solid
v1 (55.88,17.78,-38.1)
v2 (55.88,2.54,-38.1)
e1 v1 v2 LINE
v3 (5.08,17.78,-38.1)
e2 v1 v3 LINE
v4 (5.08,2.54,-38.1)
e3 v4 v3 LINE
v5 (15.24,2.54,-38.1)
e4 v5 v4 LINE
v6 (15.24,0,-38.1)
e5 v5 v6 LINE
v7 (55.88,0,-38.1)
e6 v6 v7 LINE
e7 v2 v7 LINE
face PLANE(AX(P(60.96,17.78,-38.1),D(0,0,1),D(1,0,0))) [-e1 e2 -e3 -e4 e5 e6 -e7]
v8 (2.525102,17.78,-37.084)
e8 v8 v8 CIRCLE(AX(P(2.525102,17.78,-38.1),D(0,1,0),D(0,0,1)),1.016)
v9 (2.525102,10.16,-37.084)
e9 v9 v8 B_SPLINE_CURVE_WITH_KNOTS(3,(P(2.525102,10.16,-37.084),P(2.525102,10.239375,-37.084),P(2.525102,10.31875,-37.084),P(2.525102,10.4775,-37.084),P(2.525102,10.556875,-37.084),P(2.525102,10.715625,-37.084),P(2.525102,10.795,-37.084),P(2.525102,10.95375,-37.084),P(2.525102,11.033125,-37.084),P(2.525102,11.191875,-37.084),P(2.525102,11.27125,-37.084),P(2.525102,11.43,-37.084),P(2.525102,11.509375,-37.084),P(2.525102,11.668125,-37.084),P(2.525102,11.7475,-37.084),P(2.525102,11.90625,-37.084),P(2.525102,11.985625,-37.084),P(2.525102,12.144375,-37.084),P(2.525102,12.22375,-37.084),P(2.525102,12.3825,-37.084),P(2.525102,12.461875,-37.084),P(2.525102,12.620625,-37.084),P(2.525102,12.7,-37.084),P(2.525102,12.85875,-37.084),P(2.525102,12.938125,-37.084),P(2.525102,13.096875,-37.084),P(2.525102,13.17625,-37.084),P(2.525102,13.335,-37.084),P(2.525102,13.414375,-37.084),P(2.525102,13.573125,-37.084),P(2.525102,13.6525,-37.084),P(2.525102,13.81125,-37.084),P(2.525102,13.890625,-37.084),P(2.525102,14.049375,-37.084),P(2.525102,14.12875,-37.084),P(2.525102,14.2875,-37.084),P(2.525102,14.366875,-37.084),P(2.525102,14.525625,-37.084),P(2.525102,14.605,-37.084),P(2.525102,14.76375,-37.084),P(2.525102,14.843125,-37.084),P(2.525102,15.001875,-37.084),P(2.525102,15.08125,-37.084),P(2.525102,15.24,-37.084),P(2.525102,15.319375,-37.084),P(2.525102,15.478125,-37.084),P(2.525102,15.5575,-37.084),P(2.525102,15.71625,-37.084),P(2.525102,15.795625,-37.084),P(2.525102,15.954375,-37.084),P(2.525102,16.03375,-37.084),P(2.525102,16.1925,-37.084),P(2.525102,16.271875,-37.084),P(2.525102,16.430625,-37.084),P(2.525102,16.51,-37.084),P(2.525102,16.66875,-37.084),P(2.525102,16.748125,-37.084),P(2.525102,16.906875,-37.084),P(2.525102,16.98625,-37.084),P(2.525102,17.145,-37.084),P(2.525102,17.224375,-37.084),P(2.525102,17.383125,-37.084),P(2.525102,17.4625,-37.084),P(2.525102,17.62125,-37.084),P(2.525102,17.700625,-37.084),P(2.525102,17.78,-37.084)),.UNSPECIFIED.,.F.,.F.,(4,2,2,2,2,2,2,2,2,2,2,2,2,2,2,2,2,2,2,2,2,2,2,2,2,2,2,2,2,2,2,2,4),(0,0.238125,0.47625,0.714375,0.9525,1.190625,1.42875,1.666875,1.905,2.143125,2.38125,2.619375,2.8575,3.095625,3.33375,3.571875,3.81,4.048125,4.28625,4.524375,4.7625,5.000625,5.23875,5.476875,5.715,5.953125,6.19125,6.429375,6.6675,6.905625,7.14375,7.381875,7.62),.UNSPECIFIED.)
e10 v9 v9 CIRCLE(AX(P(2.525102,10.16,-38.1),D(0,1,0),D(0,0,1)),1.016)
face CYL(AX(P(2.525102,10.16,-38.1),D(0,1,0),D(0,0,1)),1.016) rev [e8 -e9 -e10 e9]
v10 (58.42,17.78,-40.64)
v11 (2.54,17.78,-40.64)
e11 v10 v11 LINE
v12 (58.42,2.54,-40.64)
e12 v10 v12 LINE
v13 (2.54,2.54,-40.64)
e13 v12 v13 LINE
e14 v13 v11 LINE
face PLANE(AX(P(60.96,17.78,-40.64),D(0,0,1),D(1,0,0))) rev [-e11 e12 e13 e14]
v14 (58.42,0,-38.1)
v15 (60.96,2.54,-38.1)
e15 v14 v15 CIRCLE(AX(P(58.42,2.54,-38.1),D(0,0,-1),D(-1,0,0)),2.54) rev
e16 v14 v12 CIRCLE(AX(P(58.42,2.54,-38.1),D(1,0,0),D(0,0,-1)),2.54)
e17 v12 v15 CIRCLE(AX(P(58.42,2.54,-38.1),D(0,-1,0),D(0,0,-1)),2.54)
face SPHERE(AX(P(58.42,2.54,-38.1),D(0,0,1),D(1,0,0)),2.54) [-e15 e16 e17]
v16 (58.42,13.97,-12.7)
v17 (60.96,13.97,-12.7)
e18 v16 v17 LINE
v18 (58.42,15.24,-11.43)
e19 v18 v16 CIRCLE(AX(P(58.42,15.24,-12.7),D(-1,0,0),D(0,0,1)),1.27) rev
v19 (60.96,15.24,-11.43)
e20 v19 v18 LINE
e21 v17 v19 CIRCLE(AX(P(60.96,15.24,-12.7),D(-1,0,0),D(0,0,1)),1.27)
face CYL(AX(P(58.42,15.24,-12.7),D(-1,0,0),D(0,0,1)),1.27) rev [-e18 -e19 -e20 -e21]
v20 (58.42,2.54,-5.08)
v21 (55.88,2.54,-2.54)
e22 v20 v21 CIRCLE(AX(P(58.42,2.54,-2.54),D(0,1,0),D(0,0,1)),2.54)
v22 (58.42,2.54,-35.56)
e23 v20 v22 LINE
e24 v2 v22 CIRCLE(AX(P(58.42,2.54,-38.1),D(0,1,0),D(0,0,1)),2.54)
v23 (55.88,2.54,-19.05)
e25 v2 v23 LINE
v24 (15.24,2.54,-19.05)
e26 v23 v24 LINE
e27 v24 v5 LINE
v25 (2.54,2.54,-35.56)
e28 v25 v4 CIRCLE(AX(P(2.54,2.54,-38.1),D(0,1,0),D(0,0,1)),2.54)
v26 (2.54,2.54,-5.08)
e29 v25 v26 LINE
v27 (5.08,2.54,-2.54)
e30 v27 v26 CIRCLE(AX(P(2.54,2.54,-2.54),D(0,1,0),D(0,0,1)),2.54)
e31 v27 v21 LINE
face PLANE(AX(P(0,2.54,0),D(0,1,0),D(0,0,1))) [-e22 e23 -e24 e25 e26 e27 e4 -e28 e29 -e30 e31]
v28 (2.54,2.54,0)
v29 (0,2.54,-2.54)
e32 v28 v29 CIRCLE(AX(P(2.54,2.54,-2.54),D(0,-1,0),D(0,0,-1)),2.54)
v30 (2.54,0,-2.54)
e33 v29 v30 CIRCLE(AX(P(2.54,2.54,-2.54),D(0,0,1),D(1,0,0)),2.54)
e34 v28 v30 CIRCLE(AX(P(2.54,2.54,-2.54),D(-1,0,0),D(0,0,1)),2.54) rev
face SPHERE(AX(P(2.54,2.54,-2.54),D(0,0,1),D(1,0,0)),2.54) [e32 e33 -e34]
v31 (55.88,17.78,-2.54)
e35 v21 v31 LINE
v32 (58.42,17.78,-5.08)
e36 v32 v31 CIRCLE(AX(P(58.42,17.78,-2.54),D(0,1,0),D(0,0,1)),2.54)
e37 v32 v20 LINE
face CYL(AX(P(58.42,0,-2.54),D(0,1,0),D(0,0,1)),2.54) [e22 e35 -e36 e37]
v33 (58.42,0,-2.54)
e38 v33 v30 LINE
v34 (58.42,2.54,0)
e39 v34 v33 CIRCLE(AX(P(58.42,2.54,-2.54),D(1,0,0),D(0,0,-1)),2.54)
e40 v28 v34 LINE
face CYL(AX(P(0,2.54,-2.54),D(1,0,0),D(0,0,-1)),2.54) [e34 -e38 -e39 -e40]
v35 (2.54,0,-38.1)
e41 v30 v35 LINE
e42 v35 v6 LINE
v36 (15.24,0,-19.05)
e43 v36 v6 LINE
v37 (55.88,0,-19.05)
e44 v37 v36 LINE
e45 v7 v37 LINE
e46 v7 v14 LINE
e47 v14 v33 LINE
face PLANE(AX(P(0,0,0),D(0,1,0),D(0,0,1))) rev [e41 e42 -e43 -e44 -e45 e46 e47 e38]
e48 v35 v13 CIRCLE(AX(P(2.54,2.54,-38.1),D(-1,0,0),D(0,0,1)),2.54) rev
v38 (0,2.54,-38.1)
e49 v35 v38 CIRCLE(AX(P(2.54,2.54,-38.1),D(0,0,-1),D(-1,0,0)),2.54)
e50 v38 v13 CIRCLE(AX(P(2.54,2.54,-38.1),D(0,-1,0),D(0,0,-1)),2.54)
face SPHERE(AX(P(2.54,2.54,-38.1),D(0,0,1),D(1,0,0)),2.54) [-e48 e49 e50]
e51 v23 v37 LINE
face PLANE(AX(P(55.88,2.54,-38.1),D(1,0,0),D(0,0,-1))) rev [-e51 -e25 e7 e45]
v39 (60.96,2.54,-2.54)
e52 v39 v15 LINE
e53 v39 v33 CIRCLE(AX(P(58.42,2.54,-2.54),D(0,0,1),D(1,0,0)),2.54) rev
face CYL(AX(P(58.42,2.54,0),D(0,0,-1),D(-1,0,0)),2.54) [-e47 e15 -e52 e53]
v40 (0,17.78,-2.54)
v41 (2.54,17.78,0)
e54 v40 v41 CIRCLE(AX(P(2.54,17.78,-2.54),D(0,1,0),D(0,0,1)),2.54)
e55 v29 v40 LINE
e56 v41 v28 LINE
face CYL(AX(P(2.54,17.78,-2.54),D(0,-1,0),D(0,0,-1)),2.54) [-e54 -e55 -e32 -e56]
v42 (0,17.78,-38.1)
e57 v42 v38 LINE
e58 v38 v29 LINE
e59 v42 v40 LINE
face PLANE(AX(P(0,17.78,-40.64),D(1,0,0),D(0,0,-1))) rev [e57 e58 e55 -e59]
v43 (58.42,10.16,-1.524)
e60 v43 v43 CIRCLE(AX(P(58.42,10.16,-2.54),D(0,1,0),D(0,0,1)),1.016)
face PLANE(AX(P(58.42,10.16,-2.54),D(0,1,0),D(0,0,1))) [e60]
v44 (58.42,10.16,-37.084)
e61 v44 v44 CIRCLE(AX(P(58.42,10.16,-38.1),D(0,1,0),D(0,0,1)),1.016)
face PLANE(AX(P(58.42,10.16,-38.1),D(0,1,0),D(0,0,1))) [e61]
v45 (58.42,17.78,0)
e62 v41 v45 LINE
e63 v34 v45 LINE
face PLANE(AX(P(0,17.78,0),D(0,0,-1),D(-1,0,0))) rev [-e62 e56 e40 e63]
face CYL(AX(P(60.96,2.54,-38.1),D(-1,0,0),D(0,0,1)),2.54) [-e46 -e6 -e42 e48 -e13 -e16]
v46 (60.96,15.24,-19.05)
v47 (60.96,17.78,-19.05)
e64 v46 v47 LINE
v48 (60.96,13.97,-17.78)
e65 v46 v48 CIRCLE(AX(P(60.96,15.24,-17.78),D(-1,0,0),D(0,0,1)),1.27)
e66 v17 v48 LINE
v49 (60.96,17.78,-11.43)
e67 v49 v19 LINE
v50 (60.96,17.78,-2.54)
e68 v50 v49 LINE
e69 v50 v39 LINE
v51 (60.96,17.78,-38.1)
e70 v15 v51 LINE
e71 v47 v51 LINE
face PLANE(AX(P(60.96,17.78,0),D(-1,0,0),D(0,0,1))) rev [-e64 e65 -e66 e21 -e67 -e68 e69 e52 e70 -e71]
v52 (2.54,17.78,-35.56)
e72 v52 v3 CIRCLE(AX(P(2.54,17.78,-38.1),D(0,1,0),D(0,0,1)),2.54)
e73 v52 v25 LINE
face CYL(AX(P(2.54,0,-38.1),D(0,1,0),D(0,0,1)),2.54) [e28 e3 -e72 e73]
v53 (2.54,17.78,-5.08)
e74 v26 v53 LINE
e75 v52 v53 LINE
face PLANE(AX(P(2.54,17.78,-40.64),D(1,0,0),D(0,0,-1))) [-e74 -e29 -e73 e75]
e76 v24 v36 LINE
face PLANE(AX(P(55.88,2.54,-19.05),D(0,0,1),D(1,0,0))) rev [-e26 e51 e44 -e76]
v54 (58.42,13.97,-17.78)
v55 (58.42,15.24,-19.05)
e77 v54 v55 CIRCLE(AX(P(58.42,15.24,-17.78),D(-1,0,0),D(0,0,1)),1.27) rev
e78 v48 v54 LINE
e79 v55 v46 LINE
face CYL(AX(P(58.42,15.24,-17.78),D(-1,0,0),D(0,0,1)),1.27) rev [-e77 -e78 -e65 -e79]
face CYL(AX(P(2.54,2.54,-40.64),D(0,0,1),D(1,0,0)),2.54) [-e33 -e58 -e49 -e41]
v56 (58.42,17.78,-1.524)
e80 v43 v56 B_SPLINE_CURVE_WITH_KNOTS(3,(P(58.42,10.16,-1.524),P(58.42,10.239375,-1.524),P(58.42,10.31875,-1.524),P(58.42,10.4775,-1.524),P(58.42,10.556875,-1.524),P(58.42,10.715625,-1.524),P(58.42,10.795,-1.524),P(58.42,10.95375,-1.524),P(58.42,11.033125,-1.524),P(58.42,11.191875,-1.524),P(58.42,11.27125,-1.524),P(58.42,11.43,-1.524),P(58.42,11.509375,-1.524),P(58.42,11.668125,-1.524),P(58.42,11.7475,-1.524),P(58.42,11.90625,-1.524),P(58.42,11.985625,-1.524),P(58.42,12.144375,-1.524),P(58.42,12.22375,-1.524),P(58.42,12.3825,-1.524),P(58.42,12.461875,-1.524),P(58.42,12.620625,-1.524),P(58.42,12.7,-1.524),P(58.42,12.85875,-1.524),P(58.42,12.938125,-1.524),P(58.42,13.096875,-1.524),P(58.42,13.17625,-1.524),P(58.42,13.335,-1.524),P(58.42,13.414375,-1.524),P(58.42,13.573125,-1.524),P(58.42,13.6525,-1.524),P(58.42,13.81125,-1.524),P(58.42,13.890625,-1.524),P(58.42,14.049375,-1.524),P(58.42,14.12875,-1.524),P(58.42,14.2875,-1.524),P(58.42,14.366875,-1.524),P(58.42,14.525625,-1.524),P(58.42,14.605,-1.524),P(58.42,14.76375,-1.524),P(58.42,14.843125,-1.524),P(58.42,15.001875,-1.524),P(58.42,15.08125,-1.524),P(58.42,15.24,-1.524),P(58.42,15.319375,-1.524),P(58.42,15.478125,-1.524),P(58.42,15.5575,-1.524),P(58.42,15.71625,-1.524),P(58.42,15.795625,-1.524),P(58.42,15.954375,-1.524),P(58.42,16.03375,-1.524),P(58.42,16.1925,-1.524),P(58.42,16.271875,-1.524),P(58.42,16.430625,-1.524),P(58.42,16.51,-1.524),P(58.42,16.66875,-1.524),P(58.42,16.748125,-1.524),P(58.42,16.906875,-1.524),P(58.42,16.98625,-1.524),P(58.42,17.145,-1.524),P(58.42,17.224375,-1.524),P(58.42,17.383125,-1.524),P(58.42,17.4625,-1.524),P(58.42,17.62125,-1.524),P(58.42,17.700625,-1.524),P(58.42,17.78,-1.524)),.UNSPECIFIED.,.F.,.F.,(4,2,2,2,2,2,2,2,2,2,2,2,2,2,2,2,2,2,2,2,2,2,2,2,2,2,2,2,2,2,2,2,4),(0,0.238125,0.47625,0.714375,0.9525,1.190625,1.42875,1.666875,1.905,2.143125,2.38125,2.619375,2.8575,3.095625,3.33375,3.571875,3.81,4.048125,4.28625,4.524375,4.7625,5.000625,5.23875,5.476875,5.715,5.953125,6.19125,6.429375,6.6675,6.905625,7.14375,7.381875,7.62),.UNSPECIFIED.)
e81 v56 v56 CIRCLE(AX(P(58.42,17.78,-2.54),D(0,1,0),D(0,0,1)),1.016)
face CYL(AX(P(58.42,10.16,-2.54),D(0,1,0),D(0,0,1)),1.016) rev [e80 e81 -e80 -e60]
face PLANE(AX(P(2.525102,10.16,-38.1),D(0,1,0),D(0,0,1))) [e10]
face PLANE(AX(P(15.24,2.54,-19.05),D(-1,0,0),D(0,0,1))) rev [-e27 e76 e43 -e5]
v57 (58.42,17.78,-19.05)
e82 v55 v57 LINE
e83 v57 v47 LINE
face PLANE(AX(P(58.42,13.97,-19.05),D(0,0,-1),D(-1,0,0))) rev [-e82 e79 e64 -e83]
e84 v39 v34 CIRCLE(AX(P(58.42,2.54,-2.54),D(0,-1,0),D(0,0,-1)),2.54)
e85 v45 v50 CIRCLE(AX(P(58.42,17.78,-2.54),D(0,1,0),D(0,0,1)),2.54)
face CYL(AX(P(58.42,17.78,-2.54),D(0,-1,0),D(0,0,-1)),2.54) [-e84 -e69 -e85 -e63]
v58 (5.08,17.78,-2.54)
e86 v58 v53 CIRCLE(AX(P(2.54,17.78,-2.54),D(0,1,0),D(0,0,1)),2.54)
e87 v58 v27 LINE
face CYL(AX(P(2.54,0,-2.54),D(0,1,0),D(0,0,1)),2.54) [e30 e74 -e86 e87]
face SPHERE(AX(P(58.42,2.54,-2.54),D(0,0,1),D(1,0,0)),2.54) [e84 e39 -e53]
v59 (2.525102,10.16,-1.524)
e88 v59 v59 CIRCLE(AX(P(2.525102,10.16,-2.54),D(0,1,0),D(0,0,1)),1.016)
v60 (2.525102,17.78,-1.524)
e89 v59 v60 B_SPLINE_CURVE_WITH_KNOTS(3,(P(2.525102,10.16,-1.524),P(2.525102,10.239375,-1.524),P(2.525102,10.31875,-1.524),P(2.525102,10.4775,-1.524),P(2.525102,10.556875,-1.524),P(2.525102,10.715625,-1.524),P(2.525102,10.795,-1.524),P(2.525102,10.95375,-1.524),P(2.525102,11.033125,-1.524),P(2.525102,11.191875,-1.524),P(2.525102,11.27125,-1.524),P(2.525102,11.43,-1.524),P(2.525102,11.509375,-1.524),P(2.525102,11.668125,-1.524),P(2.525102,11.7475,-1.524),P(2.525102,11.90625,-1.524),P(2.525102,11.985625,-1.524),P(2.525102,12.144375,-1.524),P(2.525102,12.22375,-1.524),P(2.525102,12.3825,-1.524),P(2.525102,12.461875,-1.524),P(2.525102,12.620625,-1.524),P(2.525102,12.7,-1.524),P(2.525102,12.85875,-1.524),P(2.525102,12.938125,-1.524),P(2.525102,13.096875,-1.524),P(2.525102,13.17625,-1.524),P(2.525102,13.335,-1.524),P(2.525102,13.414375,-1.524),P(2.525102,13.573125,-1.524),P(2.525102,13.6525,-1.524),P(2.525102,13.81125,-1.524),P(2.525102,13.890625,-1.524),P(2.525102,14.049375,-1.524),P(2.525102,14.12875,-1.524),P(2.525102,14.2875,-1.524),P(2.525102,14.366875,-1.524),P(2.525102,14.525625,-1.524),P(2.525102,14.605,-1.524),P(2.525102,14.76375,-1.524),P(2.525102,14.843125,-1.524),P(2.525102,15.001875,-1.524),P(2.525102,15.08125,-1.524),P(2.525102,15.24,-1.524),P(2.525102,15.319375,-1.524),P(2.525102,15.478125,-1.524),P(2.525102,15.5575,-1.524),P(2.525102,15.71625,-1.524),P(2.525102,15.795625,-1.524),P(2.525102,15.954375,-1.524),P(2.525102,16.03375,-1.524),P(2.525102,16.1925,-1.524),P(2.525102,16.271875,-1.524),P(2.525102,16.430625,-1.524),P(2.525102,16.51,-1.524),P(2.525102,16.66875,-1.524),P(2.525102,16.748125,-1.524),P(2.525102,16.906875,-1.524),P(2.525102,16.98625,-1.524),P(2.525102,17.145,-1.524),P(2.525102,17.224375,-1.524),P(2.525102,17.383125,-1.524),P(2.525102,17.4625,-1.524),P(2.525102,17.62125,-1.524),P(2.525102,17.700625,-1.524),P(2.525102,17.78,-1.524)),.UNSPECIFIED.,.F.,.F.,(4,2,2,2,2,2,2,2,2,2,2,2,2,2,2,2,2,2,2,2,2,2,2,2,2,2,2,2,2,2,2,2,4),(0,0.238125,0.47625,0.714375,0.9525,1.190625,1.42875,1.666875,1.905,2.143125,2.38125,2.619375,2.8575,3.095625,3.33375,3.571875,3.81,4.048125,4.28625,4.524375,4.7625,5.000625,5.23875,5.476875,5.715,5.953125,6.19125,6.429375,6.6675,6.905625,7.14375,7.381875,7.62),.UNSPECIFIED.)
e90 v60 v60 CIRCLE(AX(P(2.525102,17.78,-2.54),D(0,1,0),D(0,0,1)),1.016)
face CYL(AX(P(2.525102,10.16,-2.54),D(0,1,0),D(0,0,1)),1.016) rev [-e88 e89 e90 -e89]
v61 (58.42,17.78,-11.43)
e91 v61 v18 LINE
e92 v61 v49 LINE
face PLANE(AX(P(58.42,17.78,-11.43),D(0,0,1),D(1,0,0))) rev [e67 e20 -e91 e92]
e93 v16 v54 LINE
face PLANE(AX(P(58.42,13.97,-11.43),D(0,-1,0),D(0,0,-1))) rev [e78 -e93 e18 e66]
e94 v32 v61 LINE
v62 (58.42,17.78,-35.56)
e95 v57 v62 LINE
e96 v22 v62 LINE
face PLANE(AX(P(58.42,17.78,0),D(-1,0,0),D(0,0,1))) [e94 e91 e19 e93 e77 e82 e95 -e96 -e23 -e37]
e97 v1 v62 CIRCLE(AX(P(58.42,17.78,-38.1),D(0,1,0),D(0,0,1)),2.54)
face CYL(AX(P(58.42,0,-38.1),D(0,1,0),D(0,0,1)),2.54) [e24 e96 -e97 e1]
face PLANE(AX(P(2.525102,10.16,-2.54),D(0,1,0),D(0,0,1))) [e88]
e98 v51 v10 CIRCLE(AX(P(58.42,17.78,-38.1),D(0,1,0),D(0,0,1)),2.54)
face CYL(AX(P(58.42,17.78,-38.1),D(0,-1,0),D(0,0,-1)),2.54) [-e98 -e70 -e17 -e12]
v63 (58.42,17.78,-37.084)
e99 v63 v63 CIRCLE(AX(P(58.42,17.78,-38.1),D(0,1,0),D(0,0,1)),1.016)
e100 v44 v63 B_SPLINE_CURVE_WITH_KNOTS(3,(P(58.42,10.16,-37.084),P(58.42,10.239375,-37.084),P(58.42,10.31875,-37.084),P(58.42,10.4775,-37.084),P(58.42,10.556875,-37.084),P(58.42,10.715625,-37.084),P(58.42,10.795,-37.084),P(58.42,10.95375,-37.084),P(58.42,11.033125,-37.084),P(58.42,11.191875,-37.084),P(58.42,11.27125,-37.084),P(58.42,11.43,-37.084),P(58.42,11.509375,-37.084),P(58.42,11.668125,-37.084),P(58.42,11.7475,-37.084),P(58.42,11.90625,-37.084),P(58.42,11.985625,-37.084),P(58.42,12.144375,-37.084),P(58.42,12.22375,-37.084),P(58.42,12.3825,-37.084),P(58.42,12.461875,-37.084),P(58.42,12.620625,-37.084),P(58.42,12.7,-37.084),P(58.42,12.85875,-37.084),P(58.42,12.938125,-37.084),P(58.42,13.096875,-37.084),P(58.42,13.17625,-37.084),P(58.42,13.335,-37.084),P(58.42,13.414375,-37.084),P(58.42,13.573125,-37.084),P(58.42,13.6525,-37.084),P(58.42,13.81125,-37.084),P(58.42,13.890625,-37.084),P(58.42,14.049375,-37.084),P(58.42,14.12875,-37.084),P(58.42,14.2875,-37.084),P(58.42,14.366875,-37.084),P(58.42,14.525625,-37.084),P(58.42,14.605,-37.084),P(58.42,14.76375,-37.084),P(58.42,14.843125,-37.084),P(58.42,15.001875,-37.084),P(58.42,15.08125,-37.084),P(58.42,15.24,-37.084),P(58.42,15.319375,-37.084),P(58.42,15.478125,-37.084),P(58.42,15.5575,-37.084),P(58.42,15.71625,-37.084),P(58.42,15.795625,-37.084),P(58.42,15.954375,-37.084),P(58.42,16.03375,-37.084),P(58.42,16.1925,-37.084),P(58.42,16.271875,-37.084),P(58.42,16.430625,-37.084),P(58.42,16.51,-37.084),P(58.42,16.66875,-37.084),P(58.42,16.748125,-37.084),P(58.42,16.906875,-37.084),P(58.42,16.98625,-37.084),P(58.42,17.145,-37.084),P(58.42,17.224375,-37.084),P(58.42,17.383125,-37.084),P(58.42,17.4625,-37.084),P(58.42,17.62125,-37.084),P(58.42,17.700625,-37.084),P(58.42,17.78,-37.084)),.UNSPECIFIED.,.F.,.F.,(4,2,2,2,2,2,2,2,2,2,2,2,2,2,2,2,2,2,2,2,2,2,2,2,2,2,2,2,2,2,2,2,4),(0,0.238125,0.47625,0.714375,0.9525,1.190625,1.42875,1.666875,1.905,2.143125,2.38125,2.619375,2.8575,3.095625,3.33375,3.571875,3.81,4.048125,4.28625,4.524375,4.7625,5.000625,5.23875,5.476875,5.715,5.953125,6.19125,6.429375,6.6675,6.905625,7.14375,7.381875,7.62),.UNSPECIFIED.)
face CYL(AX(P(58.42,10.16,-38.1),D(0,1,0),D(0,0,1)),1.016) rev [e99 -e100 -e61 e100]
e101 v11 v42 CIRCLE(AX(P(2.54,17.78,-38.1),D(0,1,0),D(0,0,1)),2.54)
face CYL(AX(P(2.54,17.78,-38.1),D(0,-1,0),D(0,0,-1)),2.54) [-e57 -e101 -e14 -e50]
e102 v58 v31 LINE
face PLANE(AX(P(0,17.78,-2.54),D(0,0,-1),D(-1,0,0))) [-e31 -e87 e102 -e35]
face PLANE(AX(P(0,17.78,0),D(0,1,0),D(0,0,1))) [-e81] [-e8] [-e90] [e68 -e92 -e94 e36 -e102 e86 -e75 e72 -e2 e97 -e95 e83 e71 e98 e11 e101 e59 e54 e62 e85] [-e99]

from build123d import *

# Parameters (mm, degrees)
SKETCH1_W           = 60.96
SKETCH1_H           = 40.64
BOSS_EXTRUDE1_DEPTH = 17.78
SHELL1_T            = -2.54
SKETCH2_R           = 2.54
BOSS_EXTRUDE2_DEPTH = 17.78
SKETCH3_R           = 1.016
CUT_EXTRUDE2_DEPTH  = 7.62
SKETCH5_W           = 7.62
SKETCH5_H           = 3.81
CUT_EXTRUDE3_DEPTH  = 2.54
FILLET1_R           = 1.27
SKETCH6_W           = 40.64
SKETCH6_H           = 19.05
CUT_EXTRUDE4_DEPTH  = 2.54
FILLET3_R           = 2.54


with BuildPart() as part:
    # Sketch1 → Boss-Extrude1 (new body)
    with BuildSketch(Plane(origin=(0, 0, 0), x_dir=(1, 0, 0), z_dir=(0, 1, 0))):
        with Locations((30.48, 20.32)):
            Rectangle(SKETCH1_W, SKETCH1_H)
    extrude(amount=BOSS_EXTRUDE1_DEPTH)

    # Shell1
    shell1_openings = [part.faces().sort_by_distance(p)[0] for p in [
        (30.48, 17.78, -20.32),
    ]]
    offset(amount=SHELL1_T, openings=shell1_openings, kind=Kind.INTERSECTION)

    # Sketch2 → Boss-Extrude2 (add)
    with BuildSketch(Plane(origin=(0, 17.78, 0), x_dir=(1, 0, 0), z_dir=(0, 1, 0))):
        with Locations((2.54, 2.54)):
            Circle(SKETCH2_R)
        with Locations((58.42, 2.54)):
            Circle(SKETCH2_R)
        with Locations((58.42, 38.1)):
            Circle(SKETCH2_R)
        with Locations((2.54, 38.1)):
            Circle(SKETCH2_R)
    extrude(amount=-BOSS_EXTRUDE2_DEPTH)

    # Sketch3 → Cut-Extrude2 (cut)
    with BuildSketch(Plane(origin=(0, 17.78, 0), x_dir=(1, 0, 0), z_dir=(0, 1, 0))):
        with Locations(Location((2.525101816, 38.1, 0), (0, 0, 270))):
            Circle(SKETCH3_R)
        with Locations(Location((2.525101816, 2.54, 0), (0, 0, 270))):
            Circle(SKETCH3_R)
        with Locations(Location((58.42, 2.54, 0), (0, 0, 270))):
            Circle(SKETCH3_R)
        with Locations(Location((58.42, 38.1, 0), (0, 0, 270))):
            Circle(SKETCH3_R)
    extrude(amount=-CUT_EXTRUDE2_DEPTH, mode=Mode.SUBTRACT)

    # Sketch5 → Cut-Extrude3 (cut)
    with BuildSketch(Plane(origin=(60.96, 0, 0), x_dir=(0, 0, -1), z_dir=(1, 0, 0))):
        with Locations((15.24, 15.875)):
            Rectangle(SKETCH5_W, SKETCH5_H)
    extrude(amount=-CUT_EXTRUDE3_DEPTH, mode=Mode.SUBTRACT)

    # Fillet1
    fillet1_edges = [part.edges().sort_by_distance(p)[0] for p in [
        (59.69, 13.97, -19.05),
        (59.69, 13.97, -11.43),
    ]]
    fillet(fillet1_edges, radius=FILLET1_R)

    # Sketch6 → Cut-Extrude4 (cut)
    with BuildSketch(Plane.XZ):
        with Locations((35.56, -28.575)):
            Rectangle(SKETCH6_W, SKETCH6_H)
    extrude(amount=-CUT_EXTRUDE4_DEPTH, mode=Mode.SUBTRACT)

    # Fillet3
    fillet3_edges = [part.edges().sort_by_distance(p)[0] for p in [
        (30.48, 0, -40.64),
        (60.96, 0, -20.32),
        (30.48, 0, 0),
        (0, 0, -20.32),
        (0, 8.89, -40.64),
        (60.96, 8.89, -40.64),
        (60.96, 8.89, 0),
        (0, 8.89, 0),
    ]]
    fillet(fillet3_edges, radius=FILLET3_R - 0.0001)  # a hair under: the kernel refuses the full size


solid = part.part
